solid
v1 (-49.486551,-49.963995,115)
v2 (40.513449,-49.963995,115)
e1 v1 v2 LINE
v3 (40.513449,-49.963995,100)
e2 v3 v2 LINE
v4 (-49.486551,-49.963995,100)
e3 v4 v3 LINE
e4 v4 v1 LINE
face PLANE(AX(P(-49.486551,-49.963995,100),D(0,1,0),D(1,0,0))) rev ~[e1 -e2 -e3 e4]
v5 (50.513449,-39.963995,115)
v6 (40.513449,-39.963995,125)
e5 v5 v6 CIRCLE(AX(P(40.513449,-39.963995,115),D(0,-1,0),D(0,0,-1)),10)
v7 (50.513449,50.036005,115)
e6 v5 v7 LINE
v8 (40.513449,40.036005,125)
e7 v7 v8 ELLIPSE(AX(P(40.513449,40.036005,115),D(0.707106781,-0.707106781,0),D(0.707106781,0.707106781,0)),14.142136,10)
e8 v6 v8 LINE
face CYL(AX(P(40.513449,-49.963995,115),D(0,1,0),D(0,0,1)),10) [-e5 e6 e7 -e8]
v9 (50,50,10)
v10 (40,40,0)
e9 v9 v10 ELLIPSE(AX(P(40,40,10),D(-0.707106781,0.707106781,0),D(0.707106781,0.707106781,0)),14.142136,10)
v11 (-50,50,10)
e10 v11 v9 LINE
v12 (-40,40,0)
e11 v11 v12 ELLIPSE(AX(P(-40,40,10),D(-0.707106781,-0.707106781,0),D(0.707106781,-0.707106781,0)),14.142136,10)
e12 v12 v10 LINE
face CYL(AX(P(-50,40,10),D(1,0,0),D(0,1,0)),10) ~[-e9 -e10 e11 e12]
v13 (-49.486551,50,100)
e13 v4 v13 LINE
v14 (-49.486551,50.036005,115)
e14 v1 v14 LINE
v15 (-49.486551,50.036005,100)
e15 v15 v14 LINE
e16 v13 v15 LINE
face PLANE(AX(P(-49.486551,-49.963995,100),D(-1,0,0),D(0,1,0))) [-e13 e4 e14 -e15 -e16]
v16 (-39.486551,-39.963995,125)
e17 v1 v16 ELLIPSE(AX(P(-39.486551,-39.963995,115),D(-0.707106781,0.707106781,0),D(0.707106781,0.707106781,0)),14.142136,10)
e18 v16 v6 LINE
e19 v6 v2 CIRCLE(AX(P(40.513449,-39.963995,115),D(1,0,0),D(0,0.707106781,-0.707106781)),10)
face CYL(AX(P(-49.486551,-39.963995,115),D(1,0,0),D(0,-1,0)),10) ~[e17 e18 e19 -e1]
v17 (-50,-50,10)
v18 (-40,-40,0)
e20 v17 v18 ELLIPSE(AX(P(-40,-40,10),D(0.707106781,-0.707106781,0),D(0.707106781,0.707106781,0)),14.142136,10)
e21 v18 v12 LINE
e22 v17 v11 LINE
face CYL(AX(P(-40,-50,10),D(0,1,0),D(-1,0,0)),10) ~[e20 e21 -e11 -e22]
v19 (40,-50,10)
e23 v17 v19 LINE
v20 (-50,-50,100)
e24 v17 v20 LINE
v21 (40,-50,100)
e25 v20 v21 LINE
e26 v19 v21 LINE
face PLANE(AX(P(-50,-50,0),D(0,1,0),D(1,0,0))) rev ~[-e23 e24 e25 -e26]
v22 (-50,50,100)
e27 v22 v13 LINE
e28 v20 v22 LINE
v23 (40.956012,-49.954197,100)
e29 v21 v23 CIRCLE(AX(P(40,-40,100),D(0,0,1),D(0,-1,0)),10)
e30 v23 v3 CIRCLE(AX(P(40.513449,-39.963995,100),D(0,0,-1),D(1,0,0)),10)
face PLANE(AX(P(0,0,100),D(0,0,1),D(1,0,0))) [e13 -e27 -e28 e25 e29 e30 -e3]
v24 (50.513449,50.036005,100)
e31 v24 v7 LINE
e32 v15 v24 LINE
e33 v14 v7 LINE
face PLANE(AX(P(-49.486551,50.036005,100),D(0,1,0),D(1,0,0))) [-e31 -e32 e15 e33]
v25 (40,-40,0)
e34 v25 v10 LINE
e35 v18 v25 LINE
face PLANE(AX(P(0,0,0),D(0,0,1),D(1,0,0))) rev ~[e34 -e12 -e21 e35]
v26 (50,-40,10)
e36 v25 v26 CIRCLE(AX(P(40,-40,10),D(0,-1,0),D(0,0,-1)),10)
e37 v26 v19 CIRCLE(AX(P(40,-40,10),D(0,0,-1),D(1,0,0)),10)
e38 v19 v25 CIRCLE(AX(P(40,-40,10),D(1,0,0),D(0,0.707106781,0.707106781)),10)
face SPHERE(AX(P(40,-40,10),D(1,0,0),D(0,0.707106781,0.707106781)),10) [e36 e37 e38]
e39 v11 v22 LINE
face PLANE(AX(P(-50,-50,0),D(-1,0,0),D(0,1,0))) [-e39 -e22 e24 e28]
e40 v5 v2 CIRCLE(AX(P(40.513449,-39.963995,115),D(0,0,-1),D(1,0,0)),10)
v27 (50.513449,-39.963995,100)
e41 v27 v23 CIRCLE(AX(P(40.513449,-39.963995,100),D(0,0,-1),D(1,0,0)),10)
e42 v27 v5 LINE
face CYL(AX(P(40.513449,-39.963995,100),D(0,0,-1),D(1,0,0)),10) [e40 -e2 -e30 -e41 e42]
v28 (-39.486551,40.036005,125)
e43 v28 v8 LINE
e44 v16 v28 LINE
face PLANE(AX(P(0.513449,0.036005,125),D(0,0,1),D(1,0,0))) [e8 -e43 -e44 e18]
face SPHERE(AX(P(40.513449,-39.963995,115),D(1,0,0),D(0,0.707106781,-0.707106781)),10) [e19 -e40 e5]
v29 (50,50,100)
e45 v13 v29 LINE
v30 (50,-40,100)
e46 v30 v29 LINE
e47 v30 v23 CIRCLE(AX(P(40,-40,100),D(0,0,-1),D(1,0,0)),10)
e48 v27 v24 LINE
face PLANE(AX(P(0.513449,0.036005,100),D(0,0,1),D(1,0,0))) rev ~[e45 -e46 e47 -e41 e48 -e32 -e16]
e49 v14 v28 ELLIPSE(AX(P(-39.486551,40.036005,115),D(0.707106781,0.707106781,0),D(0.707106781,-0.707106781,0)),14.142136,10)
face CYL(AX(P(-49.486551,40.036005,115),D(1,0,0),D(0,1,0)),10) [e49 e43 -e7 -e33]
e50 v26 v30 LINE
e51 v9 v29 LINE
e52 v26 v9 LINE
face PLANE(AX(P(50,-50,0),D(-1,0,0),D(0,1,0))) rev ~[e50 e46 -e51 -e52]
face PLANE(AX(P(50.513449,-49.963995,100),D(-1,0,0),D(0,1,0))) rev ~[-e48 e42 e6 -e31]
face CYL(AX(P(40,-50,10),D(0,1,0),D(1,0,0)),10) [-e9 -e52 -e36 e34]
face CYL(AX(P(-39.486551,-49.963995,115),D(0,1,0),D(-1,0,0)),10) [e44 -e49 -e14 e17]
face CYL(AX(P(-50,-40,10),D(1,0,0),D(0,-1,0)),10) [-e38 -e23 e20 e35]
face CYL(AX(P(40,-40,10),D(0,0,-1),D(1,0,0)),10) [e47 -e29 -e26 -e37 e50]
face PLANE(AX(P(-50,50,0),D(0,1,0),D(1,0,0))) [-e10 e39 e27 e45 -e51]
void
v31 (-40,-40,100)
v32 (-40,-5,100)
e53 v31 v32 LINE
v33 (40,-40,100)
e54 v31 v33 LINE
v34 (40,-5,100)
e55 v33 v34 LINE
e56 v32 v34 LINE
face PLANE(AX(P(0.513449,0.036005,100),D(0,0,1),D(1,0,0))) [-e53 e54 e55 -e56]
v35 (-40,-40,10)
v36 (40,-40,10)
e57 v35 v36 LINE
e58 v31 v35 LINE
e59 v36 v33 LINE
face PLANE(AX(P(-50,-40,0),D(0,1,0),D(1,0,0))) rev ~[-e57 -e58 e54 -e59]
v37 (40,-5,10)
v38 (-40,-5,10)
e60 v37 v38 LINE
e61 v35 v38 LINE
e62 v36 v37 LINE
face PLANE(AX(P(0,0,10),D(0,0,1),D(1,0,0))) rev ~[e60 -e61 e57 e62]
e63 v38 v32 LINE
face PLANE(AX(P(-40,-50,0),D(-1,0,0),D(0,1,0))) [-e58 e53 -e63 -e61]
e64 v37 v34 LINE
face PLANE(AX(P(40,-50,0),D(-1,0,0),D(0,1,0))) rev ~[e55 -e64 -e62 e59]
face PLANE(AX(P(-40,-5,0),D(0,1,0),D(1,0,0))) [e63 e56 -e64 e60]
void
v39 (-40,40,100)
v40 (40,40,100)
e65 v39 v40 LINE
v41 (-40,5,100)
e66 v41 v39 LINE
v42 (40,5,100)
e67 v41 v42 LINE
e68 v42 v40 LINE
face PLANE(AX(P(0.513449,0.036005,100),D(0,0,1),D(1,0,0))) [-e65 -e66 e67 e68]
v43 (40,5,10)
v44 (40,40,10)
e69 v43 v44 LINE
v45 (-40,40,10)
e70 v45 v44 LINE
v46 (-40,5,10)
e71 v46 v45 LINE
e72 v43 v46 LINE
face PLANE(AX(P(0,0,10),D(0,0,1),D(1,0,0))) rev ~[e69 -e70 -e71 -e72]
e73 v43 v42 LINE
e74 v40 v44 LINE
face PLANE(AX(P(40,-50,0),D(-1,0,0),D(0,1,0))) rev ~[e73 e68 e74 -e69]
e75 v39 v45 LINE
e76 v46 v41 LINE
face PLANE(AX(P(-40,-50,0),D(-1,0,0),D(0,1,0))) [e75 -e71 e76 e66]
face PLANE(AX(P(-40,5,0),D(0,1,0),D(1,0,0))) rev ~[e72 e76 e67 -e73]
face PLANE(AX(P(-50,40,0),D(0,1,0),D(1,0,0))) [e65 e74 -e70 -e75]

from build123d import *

# Parameters (mm, degrees)
F0_W         = 100
F0_H         = 100
F1_DEPTH     = 100
F2_T         = -10
F3_W         = 80
F3_H         = 10
F4_DEPTH     = 100
F6_W         = 100
F6_H         = 100
F7_DEPTH     = 25
F8_R         = 10
F9_R         = 10
F10_T1_DEPTH = 90
F10_S5_W     = 10
F10_S5_H     = 10
F10_T6_DEPTH = 10
F11_T1_DEPTH = 15
F11_S5_W     = 10.2
F11_S5_H     = 10.2
F11_T6_DEPTH = 10.2


# Not quite as in the source:
# - a fillet or chamfer that OpenCascade refuses, or shapes differently, is made with other operations: its cross-section is extruded or revolved along the edge and cut away or added


with BuildPart() as f1:
    # F0 (on Top) → F1 (new body)
    with BuildSketch(Plane.XY):
        Rectangle(F0_W, F0_H)
    extrude(amount=F1_DEPTH)

    # F2
    f2_openings = [f1.faces().sort_by_distance(p)[0] for p in [
        (0, 0, 100),
    ]]
    offset(amount=F2_T, openings=f2_openings)

    # F3 (on Top) → F4 (join)
    with BuildSketch(Plane.XY):
        Rectangle(F3_W, F3_H)
    extrude(amount=F4_DEPTH)

    # F6 (on offset) → F7 (join)
    with BuildSketch(Plane.XY.offset(100)):
        with Locations((0.513449031, 0.0360049307)):
            Rectangle(F6_W, F6_H)
    extrude(amount=F7_DEPTH)

    # F8
    f8_edges = [f1.edges().sort_by_distance(p)[0] for p in [
        (0.513449, 50.036005, 125),
        (-49.486551, 0.036005, 125),
        (0.513449, -49.963995, 125),
        (50.513449, 0.036005, 125),
    ]]
    fillet(f8_edges, radius=F8_R)

    # F9
    f9_edges = [f1.edges().sort_by_distance(p)[0] for p in [
        (0, -50, 0),
        (50, 0, 0),
        (0, 50, 0),
        (-50, 0, 0),
    ]]
    fillet(f9_edges, radius=F9_R)

    # F10: fillet of radius 10 on 1 edges, made by hand

    # F10_s2 → F10_t1 (cut)
    with BuildSketch(Plane.XY.offset(10)):
        with BuildLine():
            ThreePointArc((50, -40), (47.0710678119, -47.0710678119), (40, -50))
            Line((40, -50), (50, -50))
            Line((50, -50), (50, -40))
        make_face()
    extrude(amount=F10_T1_DEPTH, mode=Mode.SUBTRACT)


with BuildPart() as f10_tool4:
    # F10_s5 → F10_t6 (new body)
    with BuildSketch(Plane.YZ.offset(40)):
        with Locations((-45, 5)):
            Rectangle(F10_S5_W, F10_S5_H)
    extrude(amount=F10_T6_DEPTH)

    # F10_s7 → F10_t8 (revolve, cut)
    with BuildSketch(Plane(origin=(40, -40, 10), x_dir=(0, 0.7071067812, 0.7071067812), z_dir=(0, 0.7071067812, -0.7071067812))):
        with BuildLine():
            ThreePointArc((0, -10), (10, 0), (0, 10))
            Line((0, 10), (0, -10))
        make_face()
    revolve(axis=Axis((40, -40, 10), (1, 0, 0)), mode=Mode.SUBTRACT)


with BuildPart() as f1_1:
    add(f1.part)

    # F10_t3: cut F10_tool4
    add(f10_tool4.part, mode=Mode.SUBTRACT)

    # F11: fillet of radius 10 on 1 edges, made by hand

    # F11_s2 → F11_t1 (cut)
    with BuildSketch(Plane.XY.offset(100)):
        with BuildLine():
            ThreePointArc((50.513449031, -39.9639950693), (47.5845168429, -47.0350628811), (40.513449031, -49.9639950693))
            Line((40.513449031, -49.9639950693), (50.513449031, -49.9639950693))
            Line((50.513449031, -49.9639950693), (50.513449031, -39.9639950693))
        make_face()
    extrude(amount=F11_T1_DEPTH, mode=Mode.SUBTRACT)


with BuildPart() as f11_tool4:
    # F11_s5 → F11_t6 (new body)
    with BuildSketch(Plane.YZ.offset(40.513449031)):
        with Locations((-45.0639950693, 120.1)):
            Rectangle(F11_S5_W, F11_S5_H)
    extrude(amount=F11_T6_DEPTH)

    # F11_s7 → F11_t8 (revolve, cut)
    with BuildSketch(Plane(origin=(40.513449031, -39.9639950693, 115), x_dir=(0, 0.7071067812, -0.7071067812), z_dir=(0, -0.7071067812, -0.7071067812))):
        with BuildLine():
            ThreePointArc((0, -10), (10, 0), (0, 10))
            Line((0, 10), (0, -10))
        make_face()
    revolve(axis=Axis((40.513449031, -39.9639950693, 115), (1, 0, 0)), mode=Mode.SUBTRACT)


with BuildPart() as f1_2:
    add(f1_1.part)

    # F11_t3: cut F11_tool4
    add(f11_tool4.part, mode=Mode.SUBTRACT)


solid = f1_2.part
